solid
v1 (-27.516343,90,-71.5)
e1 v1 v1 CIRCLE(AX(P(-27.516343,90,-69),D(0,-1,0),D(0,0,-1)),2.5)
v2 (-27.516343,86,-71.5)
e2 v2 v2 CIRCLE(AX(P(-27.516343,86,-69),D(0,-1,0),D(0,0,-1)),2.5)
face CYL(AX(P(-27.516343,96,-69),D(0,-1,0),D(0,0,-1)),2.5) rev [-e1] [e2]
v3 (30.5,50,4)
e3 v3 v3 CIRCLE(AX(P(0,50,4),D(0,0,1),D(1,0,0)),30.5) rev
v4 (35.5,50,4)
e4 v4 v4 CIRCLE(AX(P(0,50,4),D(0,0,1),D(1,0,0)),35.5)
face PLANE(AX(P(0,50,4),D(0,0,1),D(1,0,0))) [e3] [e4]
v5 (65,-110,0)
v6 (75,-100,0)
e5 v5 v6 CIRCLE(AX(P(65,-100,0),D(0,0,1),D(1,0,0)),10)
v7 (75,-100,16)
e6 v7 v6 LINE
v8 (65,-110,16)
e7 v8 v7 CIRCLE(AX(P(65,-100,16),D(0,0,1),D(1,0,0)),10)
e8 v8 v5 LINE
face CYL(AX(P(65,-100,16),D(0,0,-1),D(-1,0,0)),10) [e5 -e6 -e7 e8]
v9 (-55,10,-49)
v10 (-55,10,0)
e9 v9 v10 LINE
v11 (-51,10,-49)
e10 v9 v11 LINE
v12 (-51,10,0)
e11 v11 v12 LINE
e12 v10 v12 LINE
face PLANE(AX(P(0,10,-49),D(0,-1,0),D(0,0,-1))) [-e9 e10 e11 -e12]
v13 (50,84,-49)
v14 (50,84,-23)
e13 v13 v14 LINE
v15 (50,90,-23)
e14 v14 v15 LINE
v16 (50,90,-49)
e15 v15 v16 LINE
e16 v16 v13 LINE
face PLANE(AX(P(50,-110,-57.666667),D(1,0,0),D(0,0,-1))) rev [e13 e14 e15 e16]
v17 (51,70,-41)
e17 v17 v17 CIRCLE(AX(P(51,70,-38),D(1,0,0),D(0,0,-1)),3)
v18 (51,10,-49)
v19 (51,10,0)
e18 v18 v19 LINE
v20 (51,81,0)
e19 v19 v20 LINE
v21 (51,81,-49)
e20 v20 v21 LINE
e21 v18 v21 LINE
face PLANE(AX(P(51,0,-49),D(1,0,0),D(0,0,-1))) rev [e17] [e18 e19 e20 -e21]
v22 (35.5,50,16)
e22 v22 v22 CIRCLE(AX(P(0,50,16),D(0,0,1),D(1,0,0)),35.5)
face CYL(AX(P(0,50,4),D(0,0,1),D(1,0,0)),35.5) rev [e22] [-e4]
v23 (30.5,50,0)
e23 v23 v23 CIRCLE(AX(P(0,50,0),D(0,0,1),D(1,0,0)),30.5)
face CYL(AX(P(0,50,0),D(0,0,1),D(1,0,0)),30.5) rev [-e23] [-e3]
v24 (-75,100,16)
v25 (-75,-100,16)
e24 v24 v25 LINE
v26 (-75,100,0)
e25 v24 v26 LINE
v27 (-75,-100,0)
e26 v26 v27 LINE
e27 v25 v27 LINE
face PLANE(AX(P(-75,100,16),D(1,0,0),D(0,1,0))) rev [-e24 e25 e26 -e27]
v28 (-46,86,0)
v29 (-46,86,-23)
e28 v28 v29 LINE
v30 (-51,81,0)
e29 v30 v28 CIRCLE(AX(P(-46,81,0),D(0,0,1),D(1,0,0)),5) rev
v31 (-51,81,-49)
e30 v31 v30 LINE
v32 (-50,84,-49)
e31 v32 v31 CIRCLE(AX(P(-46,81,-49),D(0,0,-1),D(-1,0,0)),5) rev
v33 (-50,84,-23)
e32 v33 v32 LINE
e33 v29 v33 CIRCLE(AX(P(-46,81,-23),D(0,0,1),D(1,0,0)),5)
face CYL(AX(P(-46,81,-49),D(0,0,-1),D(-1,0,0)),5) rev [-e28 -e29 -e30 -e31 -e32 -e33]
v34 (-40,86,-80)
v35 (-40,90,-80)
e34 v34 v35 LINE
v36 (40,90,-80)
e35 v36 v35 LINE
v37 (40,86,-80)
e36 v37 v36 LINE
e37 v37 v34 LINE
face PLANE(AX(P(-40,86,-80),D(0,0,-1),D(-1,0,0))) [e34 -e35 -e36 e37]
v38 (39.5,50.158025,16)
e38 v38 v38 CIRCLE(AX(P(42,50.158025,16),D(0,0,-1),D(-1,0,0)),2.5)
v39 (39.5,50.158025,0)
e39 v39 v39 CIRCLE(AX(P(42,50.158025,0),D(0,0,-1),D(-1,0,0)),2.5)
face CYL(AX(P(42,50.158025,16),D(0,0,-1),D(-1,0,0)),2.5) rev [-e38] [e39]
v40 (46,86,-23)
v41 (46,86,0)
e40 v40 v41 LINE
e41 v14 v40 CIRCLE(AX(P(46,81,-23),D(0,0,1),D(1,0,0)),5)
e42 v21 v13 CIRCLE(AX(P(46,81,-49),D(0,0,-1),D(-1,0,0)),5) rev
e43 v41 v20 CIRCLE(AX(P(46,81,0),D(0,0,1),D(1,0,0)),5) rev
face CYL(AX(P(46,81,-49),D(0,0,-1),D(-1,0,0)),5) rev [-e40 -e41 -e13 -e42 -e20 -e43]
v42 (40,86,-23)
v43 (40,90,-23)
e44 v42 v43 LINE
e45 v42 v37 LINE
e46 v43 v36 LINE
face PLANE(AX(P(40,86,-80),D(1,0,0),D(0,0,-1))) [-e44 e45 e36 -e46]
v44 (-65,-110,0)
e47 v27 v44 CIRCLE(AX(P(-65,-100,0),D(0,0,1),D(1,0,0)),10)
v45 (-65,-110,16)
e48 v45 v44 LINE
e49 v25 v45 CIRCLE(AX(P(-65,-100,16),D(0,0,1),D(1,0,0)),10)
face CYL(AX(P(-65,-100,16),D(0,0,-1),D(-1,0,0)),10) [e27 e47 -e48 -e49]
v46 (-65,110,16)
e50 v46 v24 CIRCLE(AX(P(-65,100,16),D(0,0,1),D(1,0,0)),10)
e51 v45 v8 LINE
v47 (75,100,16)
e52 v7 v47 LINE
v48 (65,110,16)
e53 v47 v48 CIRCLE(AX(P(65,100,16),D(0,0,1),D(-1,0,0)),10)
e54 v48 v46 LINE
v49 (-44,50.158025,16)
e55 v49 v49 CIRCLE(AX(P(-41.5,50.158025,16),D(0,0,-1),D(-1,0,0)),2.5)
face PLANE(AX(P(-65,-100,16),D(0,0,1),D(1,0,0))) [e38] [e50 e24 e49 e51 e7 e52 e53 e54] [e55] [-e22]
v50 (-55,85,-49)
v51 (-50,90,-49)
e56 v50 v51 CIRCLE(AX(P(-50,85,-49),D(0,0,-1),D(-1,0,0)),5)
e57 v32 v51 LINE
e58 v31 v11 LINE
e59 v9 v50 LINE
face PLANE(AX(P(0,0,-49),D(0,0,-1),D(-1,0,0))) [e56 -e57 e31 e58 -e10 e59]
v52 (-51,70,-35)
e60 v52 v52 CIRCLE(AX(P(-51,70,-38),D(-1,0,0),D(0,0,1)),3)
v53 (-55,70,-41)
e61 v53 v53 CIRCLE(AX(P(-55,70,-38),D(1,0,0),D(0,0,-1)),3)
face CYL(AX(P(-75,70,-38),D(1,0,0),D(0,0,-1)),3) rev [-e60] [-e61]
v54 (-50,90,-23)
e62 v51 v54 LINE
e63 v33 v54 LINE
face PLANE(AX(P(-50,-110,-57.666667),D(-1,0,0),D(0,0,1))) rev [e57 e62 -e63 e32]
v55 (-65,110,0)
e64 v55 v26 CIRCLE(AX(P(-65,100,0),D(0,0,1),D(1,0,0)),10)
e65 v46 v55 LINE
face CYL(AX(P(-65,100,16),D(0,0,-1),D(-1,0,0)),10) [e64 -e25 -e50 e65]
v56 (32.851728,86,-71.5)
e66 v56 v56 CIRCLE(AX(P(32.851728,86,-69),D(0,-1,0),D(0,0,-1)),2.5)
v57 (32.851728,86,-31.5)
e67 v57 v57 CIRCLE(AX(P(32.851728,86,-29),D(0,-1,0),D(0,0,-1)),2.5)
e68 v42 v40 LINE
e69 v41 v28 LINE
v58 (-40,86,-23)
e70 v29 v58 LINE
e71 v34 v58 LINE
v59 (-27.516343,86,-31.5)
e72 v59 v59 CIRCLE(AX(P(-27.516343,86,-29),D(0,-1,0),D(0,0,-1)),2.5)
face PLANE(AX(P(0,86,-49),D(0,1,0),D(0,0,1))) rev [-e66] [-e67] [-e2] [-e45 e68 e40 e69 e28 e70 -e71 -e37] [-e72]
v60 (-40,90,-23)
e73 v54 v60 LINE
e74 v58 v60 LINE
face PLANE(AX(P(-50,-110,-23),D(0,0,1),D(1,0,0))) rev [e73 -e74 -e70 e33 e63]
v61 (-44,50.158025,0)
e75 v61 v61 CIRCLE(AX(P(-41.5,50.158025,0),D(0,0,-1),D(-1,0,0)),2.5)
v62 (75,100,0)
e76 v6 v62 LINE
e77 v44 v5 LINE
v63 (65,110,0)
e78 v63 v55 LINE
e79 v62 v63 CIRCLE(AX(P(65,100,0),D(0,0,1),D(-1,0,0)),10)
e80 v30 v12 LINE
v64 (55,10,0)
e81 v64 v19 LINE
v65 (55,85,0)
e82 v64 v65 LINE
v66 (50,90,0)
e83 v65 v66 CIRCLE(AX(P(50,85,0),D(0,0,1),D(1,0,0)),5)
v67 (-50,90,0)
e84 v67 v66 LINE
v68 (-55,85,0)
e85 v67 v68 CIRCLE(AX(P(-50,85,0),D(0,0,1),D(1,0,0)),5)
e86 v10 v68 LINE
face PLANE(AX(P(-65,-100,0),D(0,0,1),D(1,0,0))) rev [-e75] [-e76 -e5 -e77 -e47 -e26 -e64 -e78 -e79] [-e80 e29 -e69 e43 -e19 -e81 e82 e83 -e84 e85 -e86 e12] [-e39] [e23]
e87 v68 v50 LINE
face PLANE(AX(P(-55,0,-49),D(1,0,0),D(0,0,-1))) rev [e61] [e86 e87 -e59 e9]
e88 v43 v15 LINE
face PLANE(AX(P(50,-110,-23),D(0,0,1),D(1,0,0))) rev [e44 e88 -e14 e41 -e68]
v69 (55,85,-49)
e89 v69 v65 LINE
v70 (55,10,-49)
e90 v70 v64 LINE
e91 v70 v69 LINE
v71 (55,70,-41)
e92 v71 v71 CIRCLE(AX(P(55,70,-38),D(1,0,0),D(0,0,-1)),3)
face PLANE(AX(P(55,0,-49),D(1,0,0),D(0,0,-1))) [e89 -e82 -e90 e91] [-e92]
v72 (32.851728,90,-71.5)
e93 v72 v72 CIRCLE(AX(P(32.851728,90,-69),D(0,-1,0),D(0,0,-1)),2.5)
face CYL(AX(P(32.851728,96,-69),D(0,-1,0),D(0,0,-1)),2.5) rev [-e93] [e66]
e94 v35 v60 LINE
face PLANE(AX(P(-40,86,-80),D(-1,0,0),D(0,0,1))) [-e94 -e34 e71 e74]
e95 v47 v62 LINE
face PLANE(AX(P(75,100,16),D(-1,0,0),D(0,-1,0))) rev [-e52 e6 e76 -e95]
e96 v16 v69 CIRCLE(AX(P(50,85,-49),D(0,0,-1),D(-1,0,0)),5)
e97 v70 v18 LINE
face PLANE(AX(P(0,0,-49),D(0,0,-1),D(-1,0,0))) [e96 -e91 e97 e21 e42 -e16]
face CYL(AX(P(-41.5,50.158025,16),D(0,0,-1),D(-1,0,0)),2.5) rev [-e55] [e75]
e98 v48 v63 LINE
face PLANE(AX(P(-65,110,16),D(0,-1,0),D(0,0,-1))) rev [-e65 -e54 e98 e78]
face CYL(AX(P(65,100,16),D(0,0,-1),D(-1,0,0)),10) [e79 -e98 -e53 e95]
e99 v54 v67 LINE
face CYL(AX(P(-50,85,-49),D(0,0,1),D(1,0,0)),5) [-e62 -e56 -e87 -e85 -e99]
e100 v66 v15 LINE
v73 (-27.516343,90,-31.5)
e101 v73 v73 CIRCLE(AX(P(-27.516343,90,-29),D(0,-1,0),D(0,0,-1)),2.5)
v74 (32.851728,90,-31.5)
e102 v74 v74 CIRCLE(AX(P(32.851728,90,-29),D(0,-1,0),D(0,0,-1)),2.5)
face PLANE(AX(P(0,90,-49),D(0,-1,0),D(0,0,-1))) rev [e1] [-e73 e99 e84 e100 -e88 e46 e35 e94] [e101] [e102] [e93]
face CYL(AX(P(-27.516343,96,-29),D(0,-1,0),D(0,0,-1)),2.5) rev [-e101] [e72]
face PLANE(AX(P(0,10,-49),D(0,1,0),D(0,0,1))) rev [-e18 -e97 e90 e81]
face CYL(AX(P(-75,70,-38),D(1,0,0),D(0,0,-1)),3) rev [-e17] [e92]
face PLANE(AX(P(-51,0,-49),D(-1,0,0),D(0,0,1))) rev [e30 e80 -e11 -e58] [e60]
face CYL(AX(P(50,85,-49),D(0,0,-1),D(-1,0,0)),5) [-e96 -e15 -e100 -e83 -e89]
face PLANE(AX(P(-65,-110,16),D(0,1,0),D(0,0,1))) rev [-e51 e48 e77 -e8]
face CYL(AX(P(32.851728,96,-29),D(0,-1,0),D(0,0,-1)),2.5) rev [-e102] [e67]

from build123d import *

# Parameters (mm, degrees)
SALIENTE_EXTRUIR1_DEPTH = 16
CROQUIS3_R              = 30.5
CORTAR_EXTRUIR3_DEPTH   = 135.093251135
CROQUIS4_R              = 35.5
CORTAR_EXTRUIR4_DEPTH   = 12
SALIENTE_EXTRUIR2_DEPTH = 49
CROQUIS6_W              = 80
CROQUIS6_H              = 62
SALIENTE_EXTRUIR4_DEPTH = 4
CROQUIS8_W              = 10
CROQUIS8_H              = 34.666666667
CORTAR_EXTRUIR6_DEPTH   = 229.089894559
CROQUIS9_R              = 3
CORTAR_EXTRUIR7_DEPTH   = 189.148877222
REDONDEO1_R             = 5
CROQUIS10_R             = 2.5
CORTAR_EXTRUIR8_DEPTH   = 156.32224567
CROQUIS11_R             = 2.5
CORTAR_EXTRUIR9_DEPTH   = 10


with BuildPart() as part:
    # Croquis2 → Saliente-Extruir1 (new body)
    with BuildSketch(Plane.XY):
        with BuildLine():
            Line((-65, 110), (65, 110))
            ThreePointArc((65, 110), (72.071067812, 107.071067812), (75, 100))
            Line((75, 100), (75, -100))
            ThreePointArc((75, -100), (72.071067812, -107.071067812), (65, -110))
            Line((65, -110), (-65, -110))
            ThreePointArc((-65, -110), (-72.071067812, -107.071067812), (-75, -100))
            Line((-75, -100), (-75, 100))
            ThreePointArc((-75, 100), (-72.071067812, 107.071067812), (-65, 110))
        make_face()
    extrude(amount=SALIENTE_EXTRUIR1_DEPTH)

    # Croquis3 → Cortar-Extruir3 (cut, through all)
    with BuildSketch(Plane.XY.offset(16)):
        with Locations((0, 50)):
            Circle(CROQUIS3_R)
    extrude(amount=-CORTAR_EXTRUIR3_DEPTH, mode=Mode.SUBTRACT)

    # Croquis4 → Cortar-Extruir4 (cut)
    with BuildSketch(Plane.XY.offset(16)):
        with Locations((0, 50)):
            Circle(CROQUIS4_R)
    extrude(amount=-CORTAR_EXTRUIR4_DEPTH, mode=Mode.SUBTRACT)

    # Croquis5 → Saliente-Extruir2 (add)
    with BuildSketch(Plane(origin=(0, 0, 0), x_dir=(-1, 0, 0), z_dir=(0, 0, -1))):
        Polygon((-55, 83), (-55, 10), (-51, 10), (-51, 79), (-51, 86), (-44, 86), (44, 86), (51, 86), (51, 79), (51, 10), (55, 10), (55, 83), (55, 90), (48, 90), (-48, 90), (-55, 90), align=None)
    extrude(amount=SALIENTE_EXTRUIR2_DEPTH)

    # Croquis6 → Saliente-Extruir4 (add)
    with BuildSketch(Plane(origin=(0, 90, 0), x_dir=(1, 0, 0), z_dir=(0, 1, 0))):
        with Locations((0, 49)):
            Rectangle(CROQUIS6_W, CROQUIS6_H)
    extrude(amount=-SALIENTE_EXTRUIR4_DEPTH)

    # Croquis8 → Cortar-Extruir6 (cut, through all)
    with BuildSketch(Plane(origin=(0, 90, 0), x_dir=(1, 0, 0), z_dir=(0, 1, 0))):
        with Locations((-45, 40.333333334)):
            Rectangle(CROQUIS8_W, CROQUIS8_H)
        with Locations((45, 40.333333334)):
            Rectangle(CROQUIS8_W, CROQUIS8_H)
    extrude(amount=-CORTAR_EXTRUIR6_DEPTH, mode=Mode.SUBTRACT)

    # Croquis9 → Cortar-Extruir7 (cut, through all)
    with BuildSketch(Plane(origin=(55, 0, 0), x_dir=(0, 0, -1), z_dir=(1, 0, 0))):
        with Locations((38, 70)):
            Circle(CROQUIS9_R)
    extrude(amount=-CORTAR_EXTRUIR7_DEPTH, mode=Mode.SUBTRACT)

    # Redondeo1
    redondeo1_edges = [part.edges().sort_by_distance(p)[0] for p in [
        (-51, 86, -24.5),
        (51, 86, -24.5),
        (55, 90, -24.5),
        (-55, 90, -24.5),
    ]]
    fillet(redondeo1_edges, radius=REDONDEO1_R - 0.0001)  # a hair under: the kernel refuses the full size

    # Croquis10 → Cortar-Extruir8 (cut, through all)
    with BuildSketch(Plane(origin=(0, 0, 0), x_dir=(-1, 0, 0), z_dir=(0, 0, -1))):
        with Locations((-42, 50.158024554)):
            Circle(CROQUIS10_R)
        with Locations((41.5, 50.158024554)):
            Circle(CROQUIS10_R)
    extrude(amount=-CORTAR_EXTRUIR8_DEPTH, mode=Mode.SUBTRACT)

    # Croquis11 → Cortar-Extruir9 (cut)
    with BuildSketch(Plane.XZ.offset(-86)):
        with Locations(Location((32.851728302, -29, 0), (0, 0, 270))):
            Circle(CROQUIS11_R)
        with Locations(Location((32.851728302, -69, 0), (0, 0, 270))):
            Circle(CROQUIS11_R)
        with Locations(Location((-27.516343247, -69, 0), (0, 0, 270))):
            Circle(CROQUIS11_R)
        with Locations(Location((-27.516343247, -29, 0), (0, 0, 270))):
            Circle(CROQUIS11_R)
    extrude(amount=-CORTAR_EXTRUIR9_DEPTH, mode=Mode.SUBTRACT)


solid = part.part
